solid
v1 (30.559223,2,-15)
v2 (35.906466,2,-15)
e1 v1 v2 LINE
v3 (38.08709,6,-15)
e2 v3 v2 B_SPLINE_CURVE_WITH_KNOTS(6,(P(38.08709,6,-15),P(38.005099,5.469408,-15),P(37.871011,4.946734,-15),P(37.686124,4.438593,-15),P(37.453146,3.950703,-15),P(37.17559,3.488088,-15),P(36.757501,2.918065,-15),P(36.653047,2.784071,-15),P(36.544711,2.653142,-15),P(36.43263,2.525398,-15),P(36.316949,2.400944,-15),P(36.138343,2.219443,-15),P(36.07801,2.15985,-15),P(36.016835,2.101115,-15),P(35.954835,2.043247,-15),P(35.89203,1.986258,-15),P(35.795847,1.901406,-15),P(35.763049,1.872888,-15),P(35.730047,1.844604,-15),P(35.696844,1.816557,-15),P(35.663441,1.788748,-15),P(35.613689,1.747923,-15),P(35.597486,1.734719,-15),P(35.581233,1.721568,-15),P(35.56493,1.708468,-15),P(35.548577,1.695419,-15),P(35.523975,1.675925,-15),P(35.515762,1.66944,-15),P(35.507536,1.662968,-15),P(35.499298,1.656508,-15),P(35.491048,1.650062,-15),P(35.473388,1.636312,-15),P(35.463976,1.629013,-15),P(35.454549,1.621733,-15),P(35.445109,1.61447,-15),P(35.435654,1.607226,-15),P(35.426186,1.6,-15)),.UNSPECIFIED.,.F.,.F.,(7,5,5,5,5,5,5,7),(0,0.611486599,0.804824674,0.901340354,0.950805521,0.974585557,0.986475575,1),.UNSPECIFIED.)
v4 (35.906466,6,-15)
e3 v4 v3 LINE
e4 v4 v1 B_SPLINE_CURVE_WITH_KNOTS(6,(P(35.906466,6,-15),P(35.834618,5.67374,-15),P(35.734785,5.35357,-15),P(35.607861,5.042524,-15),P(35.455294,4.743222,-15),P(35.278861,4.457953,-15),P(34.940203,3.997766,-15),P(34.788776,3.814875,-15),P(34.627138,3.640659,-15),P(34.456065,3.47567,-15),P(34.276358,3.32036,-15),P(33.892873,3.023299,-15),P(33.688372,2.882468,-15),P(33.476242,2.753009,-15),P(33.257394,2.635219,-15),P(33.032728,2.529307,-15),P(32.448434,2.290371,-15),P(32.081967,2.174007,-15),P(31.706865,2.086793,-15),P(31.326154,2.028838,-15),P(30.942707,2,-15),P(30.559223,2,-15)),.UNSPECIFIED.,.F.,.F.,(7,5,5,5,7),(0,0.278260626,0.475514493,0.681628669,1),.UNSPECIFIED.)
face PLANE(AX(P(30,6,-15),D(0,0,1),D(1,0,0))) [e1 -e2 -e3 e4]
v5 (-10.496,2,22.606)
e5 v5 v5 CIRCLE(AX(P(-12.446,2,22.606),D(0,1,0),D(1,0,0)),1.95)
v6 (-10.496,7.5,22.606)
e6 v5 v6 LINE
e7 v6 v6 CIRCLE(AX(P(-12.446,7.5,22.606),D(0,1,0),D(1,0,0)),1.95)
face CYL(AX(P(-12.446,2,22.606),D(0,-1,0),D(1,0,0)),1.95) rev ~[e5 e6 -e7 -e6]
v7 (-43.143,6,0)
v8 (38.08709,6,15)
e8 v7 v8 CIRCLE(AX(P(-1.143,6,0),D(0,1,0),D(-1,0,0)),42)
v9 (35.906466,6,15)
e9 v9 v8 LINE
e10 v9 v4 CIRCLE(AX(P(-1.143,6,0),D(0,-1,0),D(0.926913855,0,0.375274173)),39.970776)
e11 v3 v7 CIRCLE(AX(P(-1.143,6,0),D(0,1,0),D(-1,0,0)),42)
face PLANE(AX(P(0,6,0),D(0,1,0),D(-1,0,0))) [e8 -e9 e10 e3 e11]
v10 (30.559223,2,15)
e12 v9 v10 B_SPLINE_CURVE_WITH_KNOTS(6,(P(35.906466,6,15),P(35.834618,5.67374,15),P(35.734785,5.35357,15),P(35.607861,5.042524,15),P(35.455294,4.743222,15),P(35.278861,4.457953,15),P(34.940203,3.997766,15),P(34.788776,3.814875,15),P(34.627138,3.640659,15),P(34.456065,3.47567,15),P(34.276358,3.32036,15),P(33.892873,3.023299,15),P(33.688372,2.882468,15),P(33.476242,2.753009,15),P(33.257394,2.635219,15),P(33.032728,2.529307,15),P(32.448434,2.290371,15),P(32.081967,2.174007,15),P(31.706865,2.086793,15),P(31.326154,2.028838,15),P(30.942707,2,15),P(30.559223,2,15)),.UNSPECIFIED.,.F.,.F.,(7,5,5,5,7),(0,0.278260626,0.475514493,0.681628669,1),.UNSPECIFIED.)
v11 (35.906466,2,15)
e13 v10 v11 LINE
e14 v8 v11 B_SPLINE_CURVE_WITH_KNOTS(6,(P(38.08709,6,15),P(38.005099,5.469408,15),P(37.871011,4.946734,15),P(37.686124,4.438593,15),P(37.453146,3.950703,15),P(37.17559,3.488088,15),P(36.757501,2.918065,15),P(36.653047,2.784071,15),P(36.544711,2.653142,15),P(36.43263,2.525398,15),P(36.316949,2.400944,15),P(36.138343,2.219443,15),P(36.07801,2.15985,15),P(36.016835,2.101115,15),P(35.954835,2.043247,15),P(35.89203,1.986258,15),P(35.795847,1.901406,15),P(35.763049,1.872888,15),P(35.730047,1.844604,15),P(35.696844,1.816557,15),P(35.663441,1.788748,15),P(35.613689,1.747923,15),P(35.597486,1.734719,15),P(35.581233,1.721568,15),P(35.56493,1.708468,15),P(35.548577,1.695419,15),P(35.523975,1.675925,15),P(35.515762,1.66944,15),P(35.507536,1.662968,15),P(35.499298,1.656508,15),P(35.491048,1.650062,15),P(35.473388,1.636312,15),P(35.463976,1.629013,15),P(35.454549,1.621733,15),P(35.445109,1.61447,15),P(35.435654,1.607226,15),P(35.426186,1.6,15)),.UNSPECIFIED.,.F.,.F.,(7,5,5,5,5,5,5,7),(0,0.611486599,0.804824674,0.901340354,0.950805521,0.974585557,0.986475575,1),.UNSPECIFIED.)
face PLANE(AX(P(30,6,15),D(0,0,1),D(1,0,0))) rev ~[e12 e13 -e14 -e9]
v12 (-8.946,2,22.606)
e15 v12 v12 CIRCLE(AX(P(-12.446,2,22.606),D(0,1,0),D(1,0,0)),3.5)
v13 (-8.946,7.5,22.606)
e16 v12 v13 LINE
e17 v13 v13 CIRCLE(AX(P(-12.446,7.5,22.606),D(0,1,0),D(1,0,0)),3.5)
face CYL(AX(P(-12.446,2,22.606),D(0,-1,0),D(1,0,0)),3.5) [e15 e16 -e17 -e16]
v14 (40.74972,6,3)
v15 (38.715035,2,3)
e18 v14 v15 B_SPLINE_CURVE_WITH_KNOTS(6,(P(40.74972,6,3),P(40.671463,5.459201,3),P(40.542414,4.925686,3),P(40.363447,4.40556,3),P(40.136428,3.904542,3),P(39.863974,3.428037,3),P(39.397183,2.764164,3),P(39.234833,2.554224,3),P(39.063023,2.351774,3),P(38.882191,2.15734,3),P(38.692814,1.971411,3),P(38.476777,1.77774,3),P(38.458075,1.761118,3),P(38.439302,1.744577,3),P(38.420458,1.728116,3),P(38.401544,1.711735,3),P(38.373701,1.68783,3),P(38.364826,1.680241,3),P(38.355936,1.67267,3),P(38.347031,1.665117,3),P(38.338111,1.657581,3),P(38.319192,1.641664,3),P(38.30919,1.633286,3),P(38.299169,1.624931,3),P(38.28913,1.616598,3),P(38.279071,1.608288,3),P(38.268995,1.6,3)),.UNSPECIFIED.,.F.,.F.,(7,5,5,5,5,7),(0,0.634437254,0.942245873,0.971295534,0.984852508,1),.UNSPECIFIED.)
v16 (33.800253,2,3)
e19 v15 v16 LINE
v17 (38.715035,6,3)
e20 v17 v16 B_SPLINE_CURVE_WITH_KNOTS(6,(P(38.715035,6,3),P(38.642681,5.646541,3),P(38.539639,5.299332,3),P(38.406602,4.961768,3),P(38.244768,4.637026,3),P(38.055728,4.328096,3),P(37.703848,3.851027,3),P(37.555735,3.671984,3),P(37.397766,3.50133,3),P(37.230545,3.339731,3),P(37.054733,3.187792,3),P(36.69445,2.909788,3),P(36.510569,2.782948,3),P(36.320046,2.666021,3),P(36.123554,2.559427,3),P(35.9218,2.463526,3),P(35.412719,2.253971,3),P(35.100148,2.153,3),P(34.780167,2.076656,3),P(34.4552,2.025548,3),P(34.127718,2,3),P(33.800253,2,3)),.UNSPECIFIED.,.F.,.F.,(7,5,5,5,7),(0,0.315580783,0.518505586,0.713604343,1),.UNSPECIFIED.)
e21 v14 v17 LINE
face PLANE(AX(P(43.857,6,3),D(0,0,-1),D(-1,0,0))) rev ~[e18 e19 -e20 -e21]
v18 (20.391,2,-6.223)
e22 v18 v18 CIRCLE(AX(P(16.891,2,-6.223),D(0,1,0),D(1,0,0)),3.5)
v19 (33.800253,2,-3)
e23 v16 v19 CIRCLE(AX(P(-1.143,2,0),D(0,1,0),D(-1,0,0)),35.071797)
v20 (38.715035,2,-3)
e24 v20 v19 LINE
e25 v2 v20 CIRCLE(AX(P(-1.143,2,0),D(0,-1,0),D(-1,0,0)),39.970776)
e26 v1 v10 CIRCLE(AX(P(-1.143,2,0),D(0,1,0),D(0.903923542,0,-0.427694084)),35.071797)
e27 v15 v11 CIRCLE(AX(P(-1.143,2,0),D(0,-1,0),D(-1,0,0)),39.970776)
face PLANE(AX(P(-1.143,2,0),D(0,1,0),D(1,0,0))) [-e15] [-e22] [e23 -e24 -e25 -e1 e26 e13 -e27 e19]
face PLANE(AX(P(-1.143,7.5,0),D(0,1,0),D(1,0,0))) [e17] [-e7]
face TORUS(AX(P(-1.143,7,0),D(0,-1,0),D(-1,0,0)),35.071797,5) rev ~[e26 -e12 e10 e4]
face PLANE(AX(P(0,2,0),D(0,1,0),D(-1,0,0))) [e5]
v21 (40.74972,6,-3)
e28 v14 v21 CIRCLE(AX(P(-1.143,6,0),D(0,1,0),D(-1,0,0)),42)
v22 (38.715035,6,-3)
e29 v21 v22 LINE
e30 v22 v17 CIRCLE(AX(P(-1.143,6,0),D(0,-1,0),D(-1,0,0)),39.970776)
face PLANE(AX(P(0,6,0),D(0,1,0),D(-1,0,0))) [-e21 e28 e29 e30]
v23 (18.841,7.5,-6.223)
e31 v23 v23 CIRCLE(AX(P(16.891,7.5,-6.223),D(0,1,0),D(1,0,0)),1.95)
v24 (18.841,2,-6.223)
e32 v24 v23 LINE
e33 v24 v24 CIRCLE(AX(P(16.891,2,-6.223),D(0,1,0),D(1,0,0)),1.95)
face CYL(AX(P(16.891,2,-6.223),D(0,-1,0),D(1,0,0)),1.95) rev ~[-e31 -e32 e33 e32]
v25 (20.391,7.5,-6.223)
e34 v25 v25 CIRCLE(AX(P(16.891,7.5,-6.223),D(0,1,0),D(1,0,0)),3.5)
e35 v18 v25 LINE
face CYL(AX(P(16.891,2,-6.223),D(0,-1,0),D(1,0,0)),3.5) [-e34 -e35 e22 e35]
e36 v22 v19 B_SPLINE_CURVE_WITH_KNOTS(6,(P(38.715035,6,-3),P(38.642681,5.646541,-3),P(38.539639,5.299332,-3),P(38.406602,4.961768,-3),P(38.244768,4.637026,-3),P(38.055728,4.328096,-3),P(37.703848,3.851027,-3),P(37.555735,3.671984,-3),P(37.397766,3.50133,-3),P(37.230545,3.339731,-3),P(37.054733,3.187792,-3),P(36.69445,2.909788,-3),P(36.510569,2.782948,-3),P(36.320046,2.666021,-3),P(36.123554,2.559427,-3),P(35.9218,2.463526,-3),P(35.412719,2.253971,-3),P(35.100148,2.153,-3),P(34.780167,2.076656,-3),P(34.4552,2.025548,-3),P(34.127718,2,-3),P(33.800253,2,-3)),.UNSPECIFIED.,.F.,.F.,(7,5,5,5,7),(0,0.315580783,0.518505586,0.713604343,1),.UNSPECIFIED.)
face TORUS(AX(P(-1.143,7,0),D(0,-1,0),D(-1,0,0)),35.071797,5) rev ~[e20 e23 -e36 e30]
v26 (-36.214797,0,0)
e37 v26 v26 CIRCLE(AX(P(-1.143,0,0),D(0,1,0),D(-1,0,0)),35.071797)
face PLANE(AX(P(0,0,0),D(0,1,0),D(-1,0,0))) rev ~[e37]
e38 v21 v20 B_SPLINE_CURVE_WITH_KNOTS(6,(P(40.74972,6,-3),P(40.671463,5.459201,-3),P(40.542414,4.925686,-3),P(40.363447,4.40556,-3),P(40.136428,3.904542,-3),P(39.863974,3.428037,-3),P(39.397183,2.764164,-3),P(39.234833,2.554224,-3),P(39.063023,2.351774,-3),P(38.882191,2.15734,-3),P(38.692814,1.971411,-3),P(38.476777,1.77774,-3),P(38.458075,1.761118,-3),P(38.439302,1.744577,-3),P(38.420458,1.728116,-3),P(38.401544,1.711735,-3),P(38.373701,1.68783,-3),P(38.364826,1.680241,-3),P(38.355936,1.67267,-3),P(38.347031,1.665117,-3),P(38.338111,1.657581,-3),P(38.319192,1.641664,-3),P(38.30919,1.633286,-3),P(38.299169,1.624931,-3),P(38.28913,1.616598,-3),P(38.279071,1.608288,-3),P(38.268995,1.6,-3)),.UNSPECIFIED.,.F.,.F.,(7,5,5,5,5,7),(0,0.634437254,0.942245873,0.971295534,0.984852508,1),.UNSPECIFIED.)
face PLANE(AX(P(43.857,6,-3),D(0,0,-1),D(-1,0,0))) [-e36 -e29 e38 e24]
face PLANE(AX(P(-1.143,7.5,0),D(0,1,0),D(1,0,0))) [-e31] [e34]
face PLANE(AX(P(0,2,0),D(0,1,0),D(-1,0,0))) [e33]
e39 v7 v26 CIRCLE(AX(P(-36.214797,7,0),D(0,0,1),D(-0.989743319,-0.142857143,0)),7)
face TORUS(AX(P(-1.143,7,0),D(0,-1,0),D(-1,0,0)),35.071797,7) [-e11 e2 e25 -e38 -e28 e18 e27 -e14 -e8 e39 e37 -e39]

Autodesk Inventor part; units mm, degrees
ref_plane "YZ Plane" through (0, 0, 0) normal (1, 0, 0) x (0, 1, 0)
ref_plane "XZ Plane" through (0, 0, 0) normal (0, 1, 0) x (-1, 0, 0)
ref_plane "XY Plane" through (0, 0, 0) normal (0, 0, 1) x (1, 0, 0)
sketch "Sketch1" plane through (0, 0, 0) normal (0, 1, 0) x (-1, 0, 0)
  circle A0 centre (1.143, 0) radius 39 construction
  circle A1 centre (1.143, 0) radius 42
  line L0 (-21.857, 14) -> (-36.857, 14) construction
  line L1 (-36.857, 14) -> (-36.857, 5) construction
  line L2 (-36.857, 5) -> (-21.857, 5) construction
  line L3 (-21.857, 5) -> (-21.857, 14) construction
  line L4 (1.143, 0) -> (-37.857, 0)
  line L5 (0, 0) -> (0, -22) construction
  dimension "d0" = 78
  dimension "d1" = 9
  dimension "d2" = 15
  dimension "d3" = 5
  dimension "d4" = 23
  dimension "d5" = 84
  dimension "d11" = 1.143
extrude "Extrusion1" add sketch "Sketch1" along normal blind 6
fillet "Fillet1" radius 7 1 edges at (40.857, 0, 0)
shell "Shell1" thickness 2 removed faces 1 at (-4.0377, 6, 12.235)
sketch "Sketch2" plane through (-1.143, 2, 0) normal (0, 1, 0) x (1, 0, 0)
  circle A0 centre (-11.303, -22.606) radius 1.95
  circle A1 centre (18.034, 6.223) radius 1.95
  circle A2 centre (-11.303, -22.606) radius 3.5
  circle A3 centre (18.034, 6.223) radius 3.5
  point P0 (1.143, 0)
  dimension "d12" = 3.9
  dimension "d13" = 3.9
  dimension "d14" = 6.223
  dimension "d15" = 16.891
  dimension "d16" = 22.606
  dimension "d17" = 12.446
  dimension "d18" = 7
  dimension "d19" = 7
extrude "Extrusion2" add sketch "Sketch2" along normal blind 5.5
sketch "Sketch3" plane through (-1.143, 2, 0) normal (0, 1, 0) x (1, 0, 0)
  line L0 (7.5, 19.5) -> (-25.5, 19.5) construction
  line L1 (-25.5, 19.5) -> (-25.5, -9.5) construction
  line L2 (-25.5, -9.5) -> (7.5, -9.5) construction
  line L3 (7.5, -9.5) -> (7.5, 19.5) construction
  line L4 (7.5, 19.5) -> (-25.5, -9.5) construction
  line L5 (-25.5, 19.5) -> (7.5, -9.5) construction
  point P0 (1.143, 0)
  point P1 (-9, 5)
  dimension "d22" = 33
  dimension "d23" = 29
sketch "Sketch5" plane through (-1.143, 6, 0) normal (0, 1, 0) x (1, 0, 0)
  line L0 (31.143, -15) -> (45, -15)
  line L1 (45, -15) -> (45, -3)
  line L2 (45, -3) -> (31.143, -3)
  line L3 (31.143, -3) -> (31.143, -15)
  line L4 (1.143, 0) -> (-32, 0) construction
  line L5 (31.143, 15) -> (45, 15)
  line L6 (45, 15) -> (45, 3)
  line L7 (45, 3) -> (31.143, 3)
  line L8 (31.143, 3) -> (31.143, 15)
  dimension "d24" = 3
  dimension "d25" = 12
  dimension "d26" = 30
extrude "Extrusion3" cut sketch "Sketch5" against normal up to surface (4 mm away)
properties part number "Case bottom"
